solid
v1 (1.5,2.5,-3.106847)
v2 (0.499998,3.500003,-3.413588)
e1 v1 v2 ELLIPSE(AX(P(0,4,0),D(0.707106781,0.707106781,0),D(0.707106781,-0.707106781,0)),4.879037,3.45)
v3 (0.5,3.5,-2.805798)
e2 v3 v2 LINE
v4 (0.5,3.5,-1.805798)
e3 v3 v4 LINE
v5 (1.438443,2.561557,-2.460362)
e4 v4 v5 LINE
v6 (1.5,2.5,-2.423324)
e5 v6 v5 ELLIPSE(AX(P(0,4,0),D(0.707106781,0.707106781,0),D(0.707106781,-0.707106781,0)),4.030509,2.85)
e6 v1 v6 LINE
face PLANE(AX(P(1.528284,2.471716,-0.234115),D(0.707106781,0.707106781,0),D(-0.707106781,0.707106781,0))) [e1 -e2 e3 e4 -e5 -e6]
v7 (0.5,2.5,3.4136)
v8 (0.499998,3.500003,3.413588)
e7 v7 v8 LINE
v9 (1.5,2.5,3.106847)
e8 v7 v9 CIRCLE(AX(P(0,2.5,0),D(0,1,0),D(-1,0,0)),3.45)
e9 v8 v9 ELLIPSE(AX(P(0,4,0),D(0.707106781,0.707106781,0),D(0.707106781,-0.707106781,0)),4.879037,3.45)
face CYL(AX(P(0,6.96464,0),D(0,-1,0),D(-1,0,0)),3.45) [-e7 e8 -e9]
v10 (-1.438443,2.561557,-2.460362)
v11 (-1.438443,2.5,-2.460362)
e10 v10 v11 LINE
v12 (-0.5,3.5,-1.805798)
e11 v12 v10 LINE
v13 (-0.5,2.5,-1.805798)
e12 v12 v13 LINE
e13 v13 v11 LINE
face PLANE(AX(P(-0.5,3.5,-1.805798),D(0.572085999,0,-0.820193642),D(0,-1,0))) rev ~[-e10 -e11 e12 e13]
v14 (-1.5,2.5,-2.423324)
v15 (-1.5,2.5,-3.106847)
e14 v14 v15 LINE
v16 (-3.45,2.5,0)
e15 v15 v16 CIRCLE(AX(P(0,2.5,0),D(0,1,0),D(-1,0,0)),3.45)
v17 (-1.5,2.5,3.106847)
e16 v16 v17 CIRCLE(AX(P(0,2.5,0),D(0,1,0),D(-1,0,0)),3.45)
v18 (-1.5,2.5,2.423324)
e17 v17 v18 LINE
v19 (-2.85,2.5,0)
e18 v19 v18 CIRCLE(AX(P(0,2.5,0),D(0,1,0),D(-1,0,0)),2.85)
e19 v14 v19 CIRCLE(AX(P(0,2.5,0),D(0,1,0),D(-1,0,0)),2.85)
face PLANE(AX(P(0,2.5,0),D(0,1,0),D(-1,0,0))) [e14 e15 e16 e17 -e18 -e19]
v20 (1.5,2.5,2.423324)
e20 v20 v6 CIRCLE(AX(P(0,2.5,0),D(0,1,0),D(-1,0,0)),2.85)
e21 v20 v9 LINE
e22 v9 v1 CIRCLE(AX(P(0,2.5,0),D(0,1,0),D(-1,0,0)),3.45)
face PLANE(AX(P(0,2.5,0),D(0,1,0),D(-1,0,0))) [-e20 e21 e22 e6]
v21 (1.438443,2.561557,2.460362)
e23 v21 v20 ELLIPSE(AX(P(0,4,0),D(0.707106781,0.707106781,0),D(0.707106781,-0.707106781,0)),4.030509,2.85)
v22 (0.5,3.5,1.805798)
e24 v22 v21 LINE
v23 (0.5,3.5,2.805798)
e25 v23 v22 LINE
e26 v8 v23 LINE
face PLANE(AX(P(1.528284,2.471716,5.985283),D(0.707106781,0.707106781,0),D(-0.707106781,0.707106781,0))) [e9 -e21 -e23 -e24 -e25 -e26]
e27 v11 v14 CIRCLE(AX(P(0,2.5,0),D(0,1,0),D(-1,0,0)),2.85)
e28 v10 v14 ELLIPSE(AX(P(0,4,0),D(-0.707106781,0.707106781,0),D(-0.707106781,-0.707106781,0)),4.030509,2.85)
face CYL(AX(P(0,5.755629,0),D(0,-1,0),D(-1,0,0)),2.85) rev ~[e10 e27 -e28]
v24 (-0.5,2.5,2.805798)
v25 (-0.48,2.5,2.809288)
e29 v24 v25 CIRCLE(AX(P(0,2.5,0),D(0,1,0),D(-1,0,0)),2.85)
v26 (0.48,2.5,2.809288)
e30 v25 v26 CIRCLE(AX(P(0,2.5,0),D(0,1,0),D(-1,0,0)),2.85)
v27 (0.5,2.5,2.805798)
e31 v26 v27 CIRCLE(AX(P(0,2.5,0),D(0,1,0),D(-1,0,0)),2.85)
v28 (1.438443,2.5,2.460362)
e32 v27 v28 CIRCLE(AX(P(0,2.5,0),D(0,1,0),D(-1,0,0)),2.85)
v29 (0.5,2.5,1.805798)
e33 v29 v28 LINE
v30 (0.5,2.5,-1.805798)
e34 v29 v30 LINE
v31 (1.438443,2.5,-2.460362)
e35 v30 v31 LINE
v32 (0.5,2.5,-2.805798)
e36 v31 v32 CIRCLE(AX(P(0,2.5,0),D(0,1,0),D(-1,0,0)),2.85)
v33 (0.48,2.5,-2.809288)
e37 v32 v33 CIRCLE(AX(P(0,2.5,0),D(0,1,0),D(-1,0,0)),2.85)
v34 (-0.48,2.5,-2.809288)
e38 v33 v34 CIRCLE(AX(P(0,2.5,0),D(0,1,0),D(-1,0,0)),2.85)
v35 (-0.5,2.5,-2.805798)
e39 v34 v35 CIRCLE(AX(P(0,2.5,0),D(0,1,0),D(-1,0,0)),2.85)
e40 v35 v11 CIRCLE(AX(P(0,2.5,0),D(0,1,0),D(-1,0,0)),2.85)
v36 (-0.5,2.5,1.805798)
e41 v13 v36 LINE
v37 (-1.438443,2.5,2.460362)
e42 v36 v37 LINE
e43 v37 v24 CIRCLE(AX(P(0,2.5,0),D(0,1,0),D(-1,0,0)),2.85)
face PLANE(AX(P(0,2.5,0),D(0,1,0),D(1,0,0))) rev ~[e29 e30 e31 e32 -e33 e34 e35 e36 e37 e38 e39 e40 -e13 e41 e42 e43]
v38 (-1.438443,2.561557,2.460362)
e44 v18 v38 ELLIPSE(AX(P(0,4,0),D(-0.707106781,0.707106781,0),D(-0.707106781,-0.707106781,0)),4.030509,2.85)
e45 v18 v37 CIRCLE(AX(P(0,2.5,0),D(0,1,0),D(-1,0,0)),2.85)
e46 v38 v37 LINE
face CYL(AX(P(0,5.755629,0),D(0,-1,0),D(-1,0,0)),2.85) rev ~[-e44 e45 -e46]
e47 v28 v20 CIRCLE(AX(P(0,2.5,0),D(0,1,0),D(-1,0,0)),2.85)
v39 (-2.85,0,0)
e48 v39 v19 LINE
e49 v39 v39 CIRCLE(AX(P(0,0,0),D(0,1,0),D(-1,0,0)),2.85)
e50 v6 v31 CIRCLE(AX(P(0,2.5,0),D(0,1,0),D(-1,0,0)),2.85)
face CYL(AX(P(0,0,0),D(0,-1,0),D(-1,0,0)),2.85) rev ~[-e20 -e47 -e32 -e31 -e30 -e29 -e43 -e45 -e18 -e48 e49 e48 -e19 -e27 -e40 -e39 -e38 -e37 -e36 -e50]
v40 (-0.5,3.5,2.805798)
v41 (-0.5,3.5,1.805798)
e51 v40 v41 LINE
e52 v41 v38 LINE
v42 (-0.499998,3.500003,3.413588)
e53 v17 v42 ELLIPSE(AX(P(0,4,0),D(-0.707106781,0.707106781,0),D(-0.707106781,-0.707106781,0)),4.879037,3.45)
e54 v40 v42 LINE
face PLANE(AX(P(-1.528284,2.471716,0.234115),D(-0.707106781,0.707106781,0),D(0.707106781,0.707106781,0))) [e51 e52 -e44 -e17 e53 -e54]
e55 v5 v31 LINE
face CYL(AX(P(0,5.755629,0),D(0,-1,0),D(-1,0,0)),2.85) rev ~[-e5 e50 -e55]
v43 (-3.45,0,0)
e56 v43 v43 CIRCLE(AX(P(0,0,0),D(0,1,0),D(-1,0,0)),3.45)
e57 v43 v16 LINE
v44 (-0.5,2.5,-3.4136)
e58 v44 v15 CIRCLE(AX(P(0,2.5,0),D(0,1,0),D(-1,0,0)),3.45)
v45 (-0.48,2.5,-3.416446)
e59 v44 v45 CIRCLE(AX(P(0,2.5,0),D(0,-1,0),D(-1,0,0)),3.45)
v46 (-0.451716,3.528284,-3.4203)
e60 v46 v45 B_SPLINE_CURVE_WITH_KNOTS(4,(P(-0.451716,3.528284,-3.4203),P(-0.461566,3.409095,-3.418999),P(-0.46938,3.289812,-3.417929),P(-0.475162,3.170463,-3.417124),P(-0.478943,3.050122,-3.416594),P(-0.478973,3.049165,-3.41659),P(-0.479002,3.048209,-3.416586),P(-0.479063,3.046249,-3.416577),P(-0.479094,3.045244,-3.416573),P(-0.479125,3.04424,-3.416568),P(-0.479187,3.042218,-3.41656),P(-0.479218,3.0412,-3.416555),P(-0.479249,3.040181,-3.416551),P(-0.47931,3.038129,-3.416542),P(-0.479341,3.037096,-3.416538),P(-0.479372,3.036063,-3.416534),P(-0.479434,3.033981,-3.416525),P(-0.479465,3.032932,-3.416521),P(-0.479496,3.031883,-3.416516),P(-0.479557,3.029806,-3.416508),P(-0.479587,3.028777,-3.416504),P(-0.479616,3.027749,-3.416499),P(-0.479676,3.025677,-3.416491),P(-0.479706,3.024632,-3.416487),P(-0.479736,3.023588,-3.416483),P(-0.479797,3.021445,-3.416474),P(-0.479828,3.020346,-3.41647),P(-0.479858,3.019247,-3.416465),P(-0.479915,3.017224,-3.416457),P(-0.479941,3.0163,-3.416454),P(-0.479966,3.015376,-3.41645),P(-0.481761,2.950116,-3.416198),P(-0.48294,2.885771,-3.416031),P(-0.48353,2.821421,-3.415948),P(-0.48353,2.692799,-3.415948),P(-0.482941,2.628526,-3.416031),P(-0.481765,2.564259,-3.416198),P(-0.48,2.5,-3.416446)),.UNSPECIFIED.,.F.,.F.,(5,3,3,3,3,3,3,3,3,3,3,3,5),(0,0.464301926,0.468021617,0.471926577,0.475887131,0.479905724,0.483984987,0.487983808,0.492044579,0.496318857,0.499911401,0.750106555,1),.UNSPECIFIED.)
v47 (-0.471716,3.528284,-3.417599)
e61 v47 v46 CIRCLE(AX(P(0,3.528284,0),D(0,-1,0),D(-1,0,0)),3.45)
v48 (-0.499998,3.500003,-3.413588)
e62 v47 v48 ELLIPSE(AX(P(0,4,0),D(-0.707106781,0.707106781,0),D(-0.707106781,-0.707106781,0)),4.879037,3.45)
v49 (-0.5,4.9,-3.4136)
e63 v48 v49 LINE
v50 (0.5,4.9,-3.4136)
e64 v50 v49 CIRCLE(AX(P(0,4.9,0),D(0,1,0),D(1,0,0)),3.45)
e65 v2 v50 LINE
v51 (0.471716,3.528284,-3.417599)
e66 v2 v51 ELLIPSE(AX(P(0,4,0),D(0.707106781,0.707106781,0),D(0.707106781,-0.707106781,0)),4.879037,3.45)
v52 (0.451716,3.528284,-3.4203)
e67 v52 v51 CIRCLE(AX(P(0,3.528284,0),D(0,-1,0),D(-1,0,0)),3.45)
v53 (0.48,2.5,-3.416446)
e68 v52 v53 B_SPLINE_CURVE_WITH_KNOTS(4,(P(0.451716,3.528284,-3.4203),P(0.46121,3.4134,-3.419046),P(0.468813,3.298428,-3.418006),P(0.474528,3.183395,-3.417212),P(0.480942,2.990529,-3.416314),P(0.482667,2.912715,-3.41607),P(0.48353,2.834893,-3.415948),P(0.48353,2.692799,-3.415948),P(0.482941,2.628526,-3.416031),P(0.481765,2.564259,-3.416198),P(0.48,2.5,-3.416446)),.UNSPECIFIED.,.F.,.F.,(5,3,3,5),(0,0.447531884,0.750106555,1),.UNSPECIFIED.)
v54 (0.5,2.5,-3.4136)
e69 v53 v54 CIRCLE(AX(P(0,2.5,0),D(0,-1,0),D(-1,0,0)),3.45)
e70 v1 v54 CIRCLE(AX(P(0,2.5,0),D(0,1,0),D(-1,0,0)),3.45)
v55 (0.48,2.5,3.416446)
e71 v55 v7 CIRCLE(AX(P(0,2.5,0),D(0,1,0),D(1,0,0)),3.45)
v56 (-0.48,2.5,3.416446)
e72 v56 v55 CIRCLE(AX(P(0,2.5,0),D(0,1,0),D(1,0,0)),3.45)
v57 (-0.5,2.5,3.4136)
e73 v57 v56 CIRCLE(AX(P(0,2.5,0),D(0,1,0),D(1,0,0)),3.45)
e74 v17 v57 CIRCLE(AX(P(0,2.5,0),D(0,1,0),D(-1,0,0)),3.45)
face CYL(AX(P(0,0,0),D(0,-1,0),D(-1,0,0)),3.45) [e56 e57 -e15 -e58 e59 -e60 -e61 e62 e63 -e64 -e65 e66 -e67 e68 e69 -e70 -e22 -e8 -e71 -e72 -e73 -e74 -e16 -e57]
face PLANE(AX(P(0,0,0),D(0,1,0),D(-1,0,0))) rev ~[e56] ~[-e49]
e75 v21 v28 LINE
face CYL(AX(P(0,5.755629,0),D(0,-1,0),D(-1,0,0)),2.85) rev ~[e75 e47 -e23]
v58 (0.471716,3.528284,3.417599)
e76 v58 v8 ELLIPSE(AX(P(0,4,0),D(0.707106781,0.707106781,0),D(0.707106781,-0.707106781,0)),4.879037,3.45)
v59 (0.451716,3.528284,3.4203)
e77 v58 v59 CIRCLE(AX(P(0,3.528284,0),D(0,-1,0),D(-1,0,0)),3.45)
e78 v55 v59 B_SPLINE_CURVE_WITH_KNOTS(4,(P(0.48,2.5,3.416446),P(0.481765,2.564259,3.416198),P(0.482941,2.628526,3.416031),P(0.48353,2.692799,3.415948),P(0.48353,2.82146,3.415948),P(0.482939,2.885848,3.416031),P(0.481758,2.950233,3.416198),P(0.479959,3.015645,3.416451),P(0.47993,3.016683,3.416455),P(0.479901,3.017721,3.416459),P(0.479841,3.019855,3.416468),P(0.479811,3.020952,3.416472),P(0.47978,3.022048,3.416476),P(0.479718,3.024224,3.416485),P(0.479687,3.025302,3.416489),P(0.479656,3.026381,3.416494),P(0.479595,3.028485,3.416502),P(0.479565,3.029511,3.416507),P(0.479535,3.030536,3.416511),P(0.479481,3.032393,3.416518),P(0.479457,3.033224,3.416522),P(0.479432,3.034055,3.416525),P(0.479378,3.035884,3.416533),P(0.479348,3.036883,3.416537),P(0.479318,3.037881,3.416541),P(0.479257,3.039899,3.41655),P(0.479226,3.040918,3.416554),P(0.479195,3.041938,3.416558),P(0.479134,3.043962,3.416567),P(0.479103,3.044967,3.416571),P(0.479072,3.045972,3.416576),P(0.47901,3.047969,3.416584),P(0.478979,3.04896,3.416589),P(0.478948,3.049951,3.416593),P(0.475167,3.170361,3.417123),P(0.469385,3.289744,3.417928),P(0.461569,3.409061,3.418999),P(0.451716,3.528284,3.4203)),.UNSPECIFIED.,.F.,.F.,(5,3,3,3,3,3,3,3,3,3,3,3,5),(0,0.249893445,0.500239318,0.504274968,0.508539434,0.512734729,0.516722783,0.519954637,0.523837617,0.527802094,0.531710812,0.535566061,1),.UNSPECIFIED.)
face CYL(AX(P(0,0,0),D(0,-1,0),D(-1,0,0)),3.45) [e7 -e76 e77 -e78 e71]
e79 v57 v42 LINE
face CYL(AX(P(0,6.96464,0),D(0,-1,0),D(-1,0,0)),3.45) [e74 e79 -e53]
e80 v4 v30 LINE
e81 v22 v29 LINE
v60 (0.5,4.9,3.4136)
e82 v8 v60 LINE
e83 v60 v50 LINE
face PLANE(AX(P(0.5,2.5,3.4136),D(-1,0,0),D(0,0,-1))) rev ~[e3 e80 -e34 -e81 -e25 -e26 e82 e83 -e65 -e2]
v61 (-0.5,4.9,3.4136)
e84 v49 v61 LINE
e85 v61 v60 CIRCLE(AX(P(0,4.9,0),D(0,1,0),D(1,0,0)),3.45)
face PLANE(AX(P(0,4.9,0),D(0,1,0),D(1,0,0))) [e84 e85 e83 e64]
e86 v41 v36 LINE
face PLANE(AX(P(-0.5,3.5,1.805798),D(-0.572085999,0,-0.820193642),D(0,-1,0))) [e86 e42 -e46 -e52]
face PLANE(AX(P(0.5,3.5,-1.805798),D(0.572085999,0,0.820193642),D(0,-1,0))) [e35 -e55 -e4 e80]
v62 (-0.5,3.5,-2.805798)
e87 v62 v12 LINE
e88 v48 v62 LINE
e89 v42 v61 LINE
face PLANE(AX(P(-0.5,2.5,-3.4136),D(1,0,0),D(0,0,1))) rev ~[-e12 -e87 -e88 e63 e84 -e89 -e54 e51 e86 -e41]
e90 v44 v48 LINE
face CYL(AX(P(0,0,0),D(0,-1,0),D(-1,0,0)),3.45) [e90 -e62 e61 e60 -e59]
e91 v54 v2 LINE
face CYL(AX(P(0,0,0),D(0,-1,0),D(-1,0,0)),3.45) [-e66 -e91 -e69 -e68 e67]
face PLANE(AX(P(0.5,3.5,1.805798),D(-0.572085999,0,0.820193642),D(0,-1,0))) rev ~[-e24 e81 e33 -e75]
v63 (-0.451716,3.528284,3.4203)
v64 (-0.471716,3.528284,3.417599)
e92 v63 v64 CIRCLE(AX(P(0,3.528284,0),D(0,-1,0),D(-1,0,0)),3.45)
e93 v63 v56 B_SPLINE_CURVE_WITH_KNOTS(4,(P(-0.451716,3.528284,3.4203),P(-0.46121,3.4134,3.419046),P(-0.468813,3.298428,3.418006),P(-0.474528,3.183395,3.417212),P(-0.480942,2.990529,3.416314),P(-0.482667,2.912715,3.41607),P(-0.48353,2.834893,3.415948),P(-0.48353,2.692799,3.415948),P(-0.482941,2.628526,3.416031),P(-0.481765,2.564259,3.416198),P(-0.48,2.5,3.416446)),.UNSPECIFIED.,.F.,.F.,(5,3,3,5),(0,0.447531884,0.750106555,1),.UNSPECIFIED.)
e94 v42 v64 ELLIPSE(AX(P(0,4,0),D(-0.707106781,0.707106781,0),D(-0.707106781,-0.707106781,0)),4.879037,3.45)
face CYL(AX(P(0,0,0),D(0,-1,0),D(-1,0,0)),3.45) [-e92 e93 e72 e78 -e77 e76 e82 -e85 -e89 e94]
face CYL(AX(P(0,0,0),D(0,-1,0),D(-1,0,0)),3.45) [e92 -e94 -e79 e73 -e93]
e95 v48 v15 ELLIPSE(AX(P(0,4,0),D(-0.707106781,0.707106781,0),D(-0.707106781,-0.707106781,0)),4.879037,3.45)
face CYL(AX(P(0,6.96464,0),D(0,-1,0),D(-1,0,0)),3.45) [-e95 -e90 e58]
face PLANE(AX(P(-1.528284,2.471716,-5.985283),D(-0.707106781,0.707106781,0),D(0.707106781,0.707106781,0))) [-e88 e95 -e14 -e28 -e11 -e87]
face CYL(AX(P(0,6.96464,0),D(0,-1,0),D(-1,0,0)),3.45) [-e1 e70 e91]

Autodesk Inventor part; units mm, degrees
ref_plane "YZ Plane" through (0, 0, 0) normal (1, 0, 0) x (0, 1, 0)
ref_plane "XZ Plane" through (0, 0, 0) normal (0, 1, 0) x (-1, 0, 0)
ref_plane "XY Plane" through (0, 0, 0) normal (0, 0, 1) x (1, 0, 0)
sketch "스케치1" plane through (0, 0, 0) normal (0, 1, 0) x (-1, 0, 0)
  circle A0 centre (0, 0) radius 2.85
  circle A1 centre (0, 0) radius 3.45
  dimension "d0" = 5.7
  dimension "d1" = 6.9
extrude "돌출1" add sketch "스케치1" along normal blind 2.5
sketch "스케치2" plane through (0, 2.5, 0) normal (0, 1, 0) x (1, 0, 0)
  circle A0 centre (0, 0) radius 3.45 projected
  circle A1 centre (0, 0) radius 3.45 projected
  line L0 (0.5, 3.4136) -> (-0.5, 3.4136)
  line L1 (-0.5, 3.4136) -> (-0.5, -3.4136)
  line L2 (-0.5, -3.4136) -> (0.5, -3.4136)
  line L3 (0.5, -3.4136) -> (0.5, 3.4136)
  line L4 (0.5, 3.4136) -> (-0.5, -3.4136) construction
  line L5 (-0.5, 3.4136) -> (0.5, -3.4136) construction
  point P0 (-0.5, -3.4136)
  point P1 (0.5, -3.4136)
  point P2 (0.5, 3.4136)
  point P3 (-0.5, 3.4136)
  dimension "d4" = 1
extrude "돌출2" add sketch "스케치2" along normal blind 2.4 contours L0 A0 | L3 L2 L1 L0 | A0 L2
chamfer "모따기1" distance 1 angle 45 4 edges at (0.5, 2.5, 3.1097) (0.5, 2.5, -3.1097) (-0.5, 2.5, -3.1097) (-0.5, 2.5, 3.1097)
chamfer "모따기2" distance 1 angle 45 4 edges at (-0.5, 3, -2.8058) (-0.5, 3, 2.8058) (0.5, 3, 2.8058) (0.5, 3, -2.8058)
properties part number "terminalcap_4.1mm_addon"
